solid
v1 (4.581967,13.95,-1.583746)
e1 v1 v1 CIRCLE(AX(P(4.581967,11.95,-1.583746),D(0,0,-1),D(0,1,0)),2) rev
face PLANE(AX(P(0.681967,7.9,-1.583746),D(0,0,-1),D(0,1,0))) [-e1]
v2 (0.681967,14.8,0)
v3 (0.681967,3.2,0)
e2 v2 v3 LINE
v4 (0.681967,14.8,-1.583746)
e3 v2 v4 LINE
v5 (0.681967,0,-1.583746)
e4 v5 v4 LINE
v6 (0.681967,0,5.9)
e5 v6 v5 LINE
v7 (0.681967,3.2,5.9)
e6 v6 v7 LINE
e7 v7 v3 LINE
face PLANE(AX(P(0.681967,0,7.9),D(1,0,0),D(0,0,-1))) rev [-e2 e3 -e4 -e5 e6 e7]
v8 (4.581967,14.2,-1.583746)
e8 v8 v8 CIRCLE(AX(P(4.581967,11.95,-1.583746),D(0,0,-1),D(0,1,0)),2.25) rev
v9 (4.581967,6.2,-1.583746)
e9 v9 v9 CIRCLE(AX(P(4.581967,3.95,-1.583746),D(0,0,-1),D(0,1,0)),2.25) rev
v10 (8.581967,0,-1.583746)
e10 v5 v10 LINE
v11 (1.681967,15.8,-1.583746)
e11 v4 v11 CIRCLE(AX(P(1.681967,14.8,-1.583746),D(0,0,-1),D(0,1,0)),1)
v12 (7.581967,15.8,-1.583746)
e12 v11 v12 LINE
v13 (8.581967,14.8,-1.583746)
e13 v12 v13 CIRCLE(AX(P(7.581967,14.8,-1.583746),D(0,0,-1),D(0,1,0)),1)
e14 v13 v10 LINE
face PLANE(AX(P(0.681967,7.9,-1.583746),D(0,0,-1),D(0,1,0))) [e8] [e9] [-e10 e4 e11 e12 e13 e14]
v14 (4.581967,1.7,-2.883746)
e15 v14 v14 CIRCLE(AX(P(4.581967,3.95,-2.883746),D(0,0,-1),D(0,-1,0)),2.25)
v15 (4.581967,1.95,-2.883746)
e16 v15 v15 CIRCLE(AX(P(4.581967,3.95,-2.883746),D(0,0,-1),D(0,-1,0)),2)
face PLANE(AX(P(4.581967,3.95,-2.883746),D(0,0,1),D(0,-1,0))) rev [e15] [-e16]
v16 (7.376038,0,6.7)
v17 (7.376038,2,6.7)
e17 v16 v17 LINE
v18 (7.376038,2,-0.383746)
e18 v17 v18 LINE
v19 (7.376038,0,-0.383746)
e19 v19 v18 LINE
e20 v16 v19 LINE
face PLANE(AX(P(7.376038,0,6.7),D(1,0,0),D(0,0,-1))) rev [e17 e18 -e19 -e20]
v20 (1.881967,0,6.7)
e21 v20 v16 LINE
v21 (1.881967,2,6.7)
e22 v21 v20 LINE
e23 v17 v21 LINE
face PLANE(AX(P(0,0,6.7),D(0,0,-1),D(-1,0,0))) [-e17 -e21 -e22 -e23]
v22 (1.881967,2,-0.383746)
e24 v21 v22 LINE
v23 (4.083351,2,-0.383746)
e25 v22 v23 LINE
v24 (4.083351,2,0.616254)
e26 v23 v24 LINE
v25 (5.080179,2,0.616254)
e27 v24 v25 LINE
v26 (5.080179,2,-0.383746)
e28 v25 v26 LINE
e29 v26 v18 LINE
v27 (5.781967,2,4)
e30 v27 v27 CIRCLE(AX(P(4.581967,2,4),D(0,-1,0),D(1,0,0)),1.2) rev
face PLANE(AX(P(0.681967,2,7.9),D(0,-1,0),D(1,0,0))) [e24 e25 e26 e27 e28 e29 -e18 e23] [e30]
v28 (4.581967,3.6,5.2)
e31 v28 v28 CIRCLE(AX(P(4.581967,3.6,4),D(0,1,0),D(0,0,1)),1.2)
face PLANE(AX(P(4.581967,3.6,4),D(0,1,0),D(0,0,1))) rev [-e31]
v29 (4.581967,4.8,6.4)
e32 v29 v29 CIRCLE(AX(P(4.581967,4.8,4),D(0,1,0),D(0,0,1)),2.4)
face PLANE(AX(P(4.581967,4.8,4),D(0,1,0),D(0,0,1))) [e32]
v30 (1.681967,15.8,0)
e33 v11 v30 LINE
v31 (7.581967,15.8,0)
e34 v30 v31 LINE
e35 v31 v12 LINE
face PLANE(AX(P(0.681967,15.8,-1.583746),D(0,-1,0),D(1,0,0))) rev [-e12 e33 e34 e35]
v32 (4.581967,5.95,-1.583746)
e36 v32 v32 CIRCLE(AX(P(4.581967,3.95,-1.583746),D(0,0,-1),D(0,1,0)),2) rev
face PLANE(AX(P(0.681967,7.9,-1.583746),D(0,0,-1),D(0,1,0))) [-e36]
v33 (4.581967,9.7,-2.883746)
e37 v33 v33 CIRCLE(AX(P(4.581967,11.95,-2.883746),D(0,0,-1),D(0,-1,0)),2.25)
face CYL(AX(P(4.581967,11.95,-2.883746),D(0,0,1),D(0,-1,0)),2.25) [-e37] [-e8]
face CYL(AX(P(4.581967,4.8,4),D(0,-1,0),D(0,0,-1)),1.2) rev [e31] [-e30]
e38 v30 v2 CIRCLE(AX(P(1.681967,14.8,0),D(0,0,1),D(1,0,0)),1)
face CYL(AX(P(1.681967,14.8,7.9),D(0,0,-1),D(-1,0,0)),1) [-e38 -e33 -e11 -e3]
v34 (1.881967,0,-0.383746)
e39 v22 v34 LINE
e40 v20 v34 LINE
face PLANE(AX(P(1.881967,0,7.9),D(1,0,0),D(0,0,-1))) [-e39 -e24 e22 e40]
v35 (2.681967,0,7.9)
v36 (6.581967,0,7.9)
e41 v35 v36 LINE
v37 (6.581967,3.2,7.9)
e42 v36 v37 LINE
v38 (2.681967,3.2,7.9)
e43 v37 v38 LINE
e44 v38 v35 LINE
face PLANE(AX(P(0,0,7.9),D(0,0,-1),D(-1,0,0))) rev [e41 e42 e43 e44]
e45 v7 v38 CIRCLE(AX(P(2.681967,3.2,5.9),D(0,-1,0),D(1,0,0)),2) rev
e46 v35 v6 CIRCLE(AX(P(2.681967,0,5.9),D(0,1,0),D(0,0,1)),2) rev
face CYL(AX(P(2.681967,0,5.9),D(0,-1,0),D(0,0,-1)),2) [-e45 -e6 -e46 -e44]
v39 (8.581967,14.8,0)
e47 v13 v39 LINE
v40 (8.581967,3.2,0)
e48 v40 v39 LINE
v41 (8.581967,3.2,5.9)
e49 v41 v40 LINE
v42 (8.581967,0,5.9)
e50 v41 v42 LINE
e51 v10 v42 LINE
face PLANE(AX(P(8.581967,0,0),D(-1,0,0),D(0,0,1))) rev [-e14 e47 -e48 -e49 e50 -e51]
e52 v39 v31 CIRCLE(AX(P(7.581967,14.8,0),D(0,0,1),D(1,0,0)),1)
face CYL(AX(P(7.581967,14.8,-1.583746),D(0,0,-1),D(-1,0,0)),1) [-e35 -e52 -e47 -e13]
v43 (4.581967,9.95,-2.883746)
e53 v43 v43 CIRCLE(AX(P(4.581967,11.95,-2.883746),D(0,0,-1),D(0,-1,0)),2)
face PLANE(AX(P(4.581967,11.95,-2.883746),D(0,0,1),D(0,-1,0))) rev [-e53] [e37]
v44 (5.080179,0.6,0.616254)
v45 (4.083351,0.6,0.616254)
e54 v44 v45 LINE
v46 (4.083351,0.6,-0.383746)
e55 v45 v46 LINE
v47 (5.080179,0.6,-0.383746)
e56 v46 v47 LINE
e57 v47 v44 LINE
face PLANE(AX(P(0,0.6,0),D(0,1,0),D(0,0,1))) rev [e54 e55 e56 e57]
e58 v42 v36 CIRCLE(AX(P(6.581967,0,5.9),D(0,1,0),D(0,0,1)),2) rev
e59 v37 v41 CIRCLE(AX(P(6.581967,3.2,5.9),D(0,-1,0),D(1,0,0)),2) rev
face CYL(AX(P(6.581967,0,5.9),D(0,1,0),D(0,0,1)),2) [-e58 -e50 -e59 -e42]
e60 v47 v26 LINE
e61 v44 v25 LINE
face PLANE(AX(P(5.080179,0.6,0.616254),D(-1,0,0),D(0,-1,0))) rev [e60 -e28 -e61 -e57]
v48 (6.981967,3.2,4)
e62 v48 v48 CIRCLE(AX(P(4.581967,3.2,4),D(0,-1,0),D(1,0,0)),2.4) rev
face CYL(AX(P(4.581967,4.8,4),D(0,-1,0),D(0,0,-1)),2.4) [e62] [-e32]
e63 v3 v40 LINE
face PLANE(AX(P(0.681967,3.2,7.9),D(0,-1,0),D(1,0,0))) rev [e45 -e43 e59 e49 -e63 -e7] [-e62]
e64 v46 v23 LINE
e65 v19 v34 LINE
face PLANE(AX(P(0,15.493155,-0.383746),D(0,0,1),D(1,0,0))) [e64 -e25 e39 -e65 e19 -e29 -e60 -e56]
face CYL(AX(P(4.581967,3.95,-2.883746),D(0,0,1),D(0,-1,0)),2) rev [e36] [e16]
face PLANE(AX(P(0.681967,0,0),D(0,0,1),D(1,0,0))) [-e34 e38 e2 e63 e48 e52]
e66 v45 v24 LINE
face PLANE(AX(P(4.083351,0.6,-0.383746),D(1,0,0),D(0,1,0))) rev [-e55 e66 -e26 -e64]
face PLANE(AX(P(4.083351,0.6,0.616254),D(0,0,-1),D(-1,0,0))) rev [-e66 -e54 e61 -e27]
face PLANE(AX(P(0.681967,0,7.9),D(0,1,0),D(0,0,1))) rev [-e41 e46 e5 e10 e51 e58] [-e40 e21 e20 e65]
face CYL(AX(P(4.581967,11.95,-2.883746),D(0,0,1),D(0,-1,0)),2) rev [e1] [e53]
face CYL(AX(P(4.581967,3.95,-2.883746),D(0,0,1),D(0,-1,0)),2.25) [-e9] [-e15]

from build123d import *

# Parameters (mm, degrees)
MAINBASESKETCH_W             = 15.8
MAINBASESKETCH_H             = 3.2
MAINBASEEXTRUDE_DEPTH        = 7.9
STUDSSKETCH_R                = 2.4
STUDSEXTRUDE_DEPTH           = 1.6
STUDSPATTERN_COUNT           = 2
STUDSPATTERN_PITCH           = 8
STUDSPATTERN_COUNT_DIR2      = 2
STUDSPATTERN_PITCH_DIR2      = 8
MAINBASESHELL_T              = -1.2
LCUTBLUE_DEPTH               = 19.555463972
LCUTBLUE_DEPTH_BACK          = 19.555463972
CUTADDEDTOLCUT_DEPTH         = 2
MADESLIMCUTSKETCH_W          = 7.9
MADESLIMCUTSKETCH_H          = 7.9
MADESLIMCUT_DEPTH            = 19.897228453
MADESLIMFILLEXT_REACH        = 20.897
SKETCH33_W                   = 5.500952983
SKETCH33_H                   = 1.199047018
SHORTLEXTENSIONSKETCH_W      = 1.583745828
SHORTLEXTENSIONSKETCH_H      = 7.9
SHORTLEXTENDEDCUTSKETCH_W    = 13.4
SHORTLEXTENDEDCUTSKETCH_H    = 1.582792846
SHORTLEXTENDEDCUT_DEPTH      = 2
SHORTLUNDERSTUMPS_START      = -0.2
SHORTLUNDERSTUMPSKETCH_W     = 0.996828098
SHORTLUNDERSTUMPSKETCH_H     = 1
SHORTLUNDERSTUMPS_DEPTH      = 1.6
SHORTLUPPERCIRCLES_START     = -0.2
SHORTLUPPERCIRCLESSKETCH_R   = 2.25
SHORTLUPPERCIRCLESSKETCH_R_2 = 2
SHORTLUPPERCIRCLES_DEPTH     = 1.5
CUT_EXTRUDE17_DEPTH          = 7.9
SKETCH60_W                   = 1.205928798
SKETCH60_H                   = 7.083745828
SKETCH63_W                   = 1.583745828
SKETCH63_H                   = 7.9
LPATTERN2_START              = -2.883745828
LPATTERN2_OUTLINE_R          = 2.25
LPATTERN2_OUTLINE_R_2        = 2
LPATTERN2_DEPTH              = 1.3
FILLET4_R                    = 1
FILLET16_R                   = 2


# Read off the part's stored shape, not the designer's step: LPattern2
with BuildPart() as part:
    # MainBaseSketch → MainBaseExtrude (new, symmetric)
    with BuildSketch(Plane.XY):
        with Locations((8.581967213, 1.6)):
            Rectangle(MAINBASESKETCH_W, MAINBASESKETCH_H)
    extrude(amount=MAINBASEEXTRUDE_DEPTH, both=True)

    # StudsSketch → StudsExtrude (add)
    with BuildSketch(Plane(origin=(0, 3.2, 0), x_dir=(1, 0, 0), z_dir=(0, 1, 0))):
        with Locations((4.581967213, 4)):
            Circle(STUDSSKETCH_R)
    studsextrude = extrude(amount=STUDSEXTRUDE_DEPTH)

    # StudsPattern: StudsExtrude 2 × 2
    with Locations(*[(j * STUDSPATTERN_PITCH_DIR2, 0, i * STUDSPATTERN_PITCH) for i in range(STUDSPATTERN_COUNT) for j in range(STUDSPATTERN_COUNT_DIR2) if (i, j) != (0, 0)]):
        add(studsextrude)

    # MainBaseShell
    mainbaseshell_openings = [part.faces().sort_by_distance(p)[0] for p in [
        (8.581967213, 0, 0),
    ]]
    offset(amount=MAINBASESHELL_T, openings=mainbaseshell_openings, kind=Kind.INTERSECTION)

    # LCUTBlueSketch → LCutBlue (cut, two sides: drawn at the far end of the back side and taken through both)
    with BuildSketch(Plane(origin=(0, 3.2, 0), x_dir=(1, 0, 0), z_dir=(0, 1, 0)).offset(-LCUTBLUE_DEPTH_BACK)):
        Polygon((8.581967213, 53.229874044), (8.581967213, 7.9), (8.581967213, 0), (16.481967213, 0), (61.811841258, 0), (125.917963912, 64.106122654), (72.688089868, 117.335996699), align=None)
    extrude(amount=LCUTBLUE_DEPTH + LCUTBLUE_DEPTH_BACK, mode=Mode.SUBTRACT)

    # CutAddedtoLSketch → CutAddedToLCut (add)
    with BuildSketch(Plane.XZ):
        Polygon((7.382920196, -6.7), (8.581967213, -6.7), (8.581967213, 0), (15.281967213, 0), (15.281967213, 1.199047018), (7.382920196, 1.199047018), (7.382920196, 0), align=None)
    extrude(amount=-CUTADDEDTOLCUT_DEPTH)

    # MadeSlimCutSketch → MadeSlimCut (cut, through all)
    with BuildSketch(Plane.XZ):
        with Locations((4.631967213, -3.95)):
            Rectangle(MADESLIMCUTSKETCH_W, MADESLIMCUTSKETCH_H)
    extrude(amount=-MADESLIMCUT_DEPTH, mode=Mode.SUBTRACT)

    # Sketch33 → MadeSlimFillExt (add, up to next)
    with BuildSketch(Plane.XZ, mode=Mode.PRIVATE) as madeslimfillext_sk1:
        with Locations((4.632443704, 0.599523509)):
            Rectangle(SKETCH33_W, SKETCH33_H)
    madeslimfillext_tool1 = extrude(madeslimfillext_sk1.sketch, amount=-MADESLIMFILLEXT_REACH, mode=Mode.PRIVATE) - part.part
    add(madeslimfillext_tool1.solids().sort_by_distance((4.632444, 0, 0.599524))[0])

    # ShortLExtension: sweep along a curve in space
    with BuildLine() as shortlextension_path:
        Line((0.681967213, 3.2, 0), (16.481967213, 3.2, 0))
    # ShortLExtensionSketch → ShortLExtension (sweep)
    with BuildSketch(Plane(origin=(16.481967213, 0, 0), x_dir=(0, 0, -1), z_dir=(1, 0, 0))):
        with Locations((0.791872914, 3.95)):
            Rectangle(SHORTLEXTENSIONSKETCH_W, SHORTLEXTENSIONSKETCH_H)
    sweep(path=shortlextension_path.line)

    # ShortLExtendedCutSketch → ShortLExtendedCut (cut)
    with BuildSketch(Plane.XZ):
        with Locations((8.581967213, 0.407650595)):
            Rectangle(SHORTLEXTENDEDCUTSKETCH_W, SHORTLEXTENDEDCUTSKETCH_H)
    extrude(amount=-SHORTLEXTENDEDCUT_DEPTH, mode=Mode.SUBTRACT)

    # ShortLUnderStumpSketch → ShortLUnderStumps (add)
    with BuildSketch(Plane.XZ.offset(-2).offset(SHORTLUNDERSTUMPS_START)):
        with Locations((4.581764801, 0.116254172)):
            Rectangle(SHORTLUNDERSTUMPSKETCH_W, SHORTLUNDERSTUMPSKETCH_H)
        with Locations((8.57767054, 0.116254172)):
            Rectangle(SHORTLUNDERSTUMPSKETCH_W, SHORTLUNDERSTUMPSKETCH_H)
        with Locations((12.582169625, 0.116254172)):
            Rectangle(SHORTLUNDERSTUMPSKETCH_W, SHORTLUNDERSTUMPSKETCH_H)
    extrude(amount=SHORTLUNDERSTUMPS_DEPTH)

    # ShortLUpperCirclesSketch → ShortLUpperCircles (add)
    # profile 1 of 2: a face of its own
    with BuildSketch(Plane(origin=(0, 0, -1.583745828), x_dir=(-1, 0, 0), z_dir=(0, 0, -1)).offset(SHORTLUPPERCIRCLES_START)):
        with Locations(Location((-12.581967213, 3.95, 0), (0, 0, 90))):
            Circle(SHORTLUPPERCIRCLESSKETCH_R)
        with Locations(Location((-12.581967213, 3.95, 0), (0, 0, 90))):
            Circle(SHORTLUPPERCIRCLESSKETCH_R_2, mode=Mode.SUBTRACT)
    # profile 2 of 2: a face of its own
    with BuildSketch(Plane(origin=(0, 0, -1.583745828), x_dir=(-1, 0, 0), z_dir=(0, 0, -1)).offset(SHORTLUPPERCIRCLES_START)):
        with Locations(Location((-4.581967213, 3.95, 0), (0, 0, 270))):
            Circle(SHORTLUPPERCIRCLESSKETCH_R)
        with Locations(Location((-4.581967213, 3.95, 0), (0, 0, 270))):
            Circle(SHORTLUPPERCIRCLESSKETCH_R_2, mode=Mode.SUBTRACT)
    extrude(amount=SHORTLUPPERCIRCLES_DEPTH)

    # Sketch59 → Cut-Extrude17 (cut)
    with BuildSketch(Plane.ZY.offset(-8.581967213)):
        Polygon((-1.583745828, 6.2), (-1.583745828, 7.9), (0, 7.9), (0, 3.2), (1.6, 3.2), (1.6, 4.8), (6.4, 4.8), (6.4, 3.2), (7.9, 3.2), (7.9, 0), (-1.583745828, 0), (-1.583745828, 1.7), (-2.883745828, 1.7), (-2.883745828, 6.2), align=None)
    extrude(amount=-CUT_EXTRUDE17_DEPTH, mode=Mode.SUBTRACT)

    # Sweep4: sweep along a curve in space
    with BuildLine() as sweep4_path:
        Line((8.581967213, 0, 6.7), (8.581967213, 2, 6.7))
    # Sketch60 → Sweep4 (sweep)
    with BuildSketch(Plane(origin=(0, 0, 0), x_dir=(-1, 0, 0), z_dir=(0, -1, 0))):
        with Locations((-7.979002814, -3.158127086)):
            Rectangle(SKETCH60_W, SKETCH60_H)
    sweep(path=sweep4_path.line)

    # Sweep5: sweep along a curve in space
    with BuildLine() as sweep5_path:
        Line((0.681967213, 7.9, 0), (8.581967213, 7.9, 0))
    # Sketch63 → Sweep5 (sweep)
    with BuildSketch(Plane.ZY.offset(-0.681967213)):
        with Locations((-0.791872914, 11.85)):
            Rectangle(SKETCH63_W, SKETCH63_H)
    sweep(path=sweep5_path.line)

    # LPattern2 outline → LPattern2 (add)
    with BuildSketch(Plane.XY.offset(LPATTERN2_START)):
        with Locations((4.581967213, 11.95)):
            Circle(LPATTERN2_OUTLINE_R)
        with Locations((4.581967213, 11.95)):
            Circle(LPATTERN2_OUTLINE_R_2, mode=Mode.SUBTRACT)
    extrude(amount=LPATTERN2_DEPTH)

    # Fillet4
    fillet4_edges = [part.edges().sort_by_distance(p)[0] for p in [
        (0.681967213, 15.8, -0.791872914),
        (8.581967213, 15.8, -0.791872914),
    ]]
    fillet(fillet4_edges, radius=FILLET4_R)

    # Fillet16
    fillet16_edges = [part.edges().sort_by_distance(p)[0] for p in [
        (8.581967213, 1.6, 7.9),
        (0.681967213, 1.6, 7.9),
    ]]
    fillet(fillet16_edges, radius=FILLET16_R)


solid = part.part
